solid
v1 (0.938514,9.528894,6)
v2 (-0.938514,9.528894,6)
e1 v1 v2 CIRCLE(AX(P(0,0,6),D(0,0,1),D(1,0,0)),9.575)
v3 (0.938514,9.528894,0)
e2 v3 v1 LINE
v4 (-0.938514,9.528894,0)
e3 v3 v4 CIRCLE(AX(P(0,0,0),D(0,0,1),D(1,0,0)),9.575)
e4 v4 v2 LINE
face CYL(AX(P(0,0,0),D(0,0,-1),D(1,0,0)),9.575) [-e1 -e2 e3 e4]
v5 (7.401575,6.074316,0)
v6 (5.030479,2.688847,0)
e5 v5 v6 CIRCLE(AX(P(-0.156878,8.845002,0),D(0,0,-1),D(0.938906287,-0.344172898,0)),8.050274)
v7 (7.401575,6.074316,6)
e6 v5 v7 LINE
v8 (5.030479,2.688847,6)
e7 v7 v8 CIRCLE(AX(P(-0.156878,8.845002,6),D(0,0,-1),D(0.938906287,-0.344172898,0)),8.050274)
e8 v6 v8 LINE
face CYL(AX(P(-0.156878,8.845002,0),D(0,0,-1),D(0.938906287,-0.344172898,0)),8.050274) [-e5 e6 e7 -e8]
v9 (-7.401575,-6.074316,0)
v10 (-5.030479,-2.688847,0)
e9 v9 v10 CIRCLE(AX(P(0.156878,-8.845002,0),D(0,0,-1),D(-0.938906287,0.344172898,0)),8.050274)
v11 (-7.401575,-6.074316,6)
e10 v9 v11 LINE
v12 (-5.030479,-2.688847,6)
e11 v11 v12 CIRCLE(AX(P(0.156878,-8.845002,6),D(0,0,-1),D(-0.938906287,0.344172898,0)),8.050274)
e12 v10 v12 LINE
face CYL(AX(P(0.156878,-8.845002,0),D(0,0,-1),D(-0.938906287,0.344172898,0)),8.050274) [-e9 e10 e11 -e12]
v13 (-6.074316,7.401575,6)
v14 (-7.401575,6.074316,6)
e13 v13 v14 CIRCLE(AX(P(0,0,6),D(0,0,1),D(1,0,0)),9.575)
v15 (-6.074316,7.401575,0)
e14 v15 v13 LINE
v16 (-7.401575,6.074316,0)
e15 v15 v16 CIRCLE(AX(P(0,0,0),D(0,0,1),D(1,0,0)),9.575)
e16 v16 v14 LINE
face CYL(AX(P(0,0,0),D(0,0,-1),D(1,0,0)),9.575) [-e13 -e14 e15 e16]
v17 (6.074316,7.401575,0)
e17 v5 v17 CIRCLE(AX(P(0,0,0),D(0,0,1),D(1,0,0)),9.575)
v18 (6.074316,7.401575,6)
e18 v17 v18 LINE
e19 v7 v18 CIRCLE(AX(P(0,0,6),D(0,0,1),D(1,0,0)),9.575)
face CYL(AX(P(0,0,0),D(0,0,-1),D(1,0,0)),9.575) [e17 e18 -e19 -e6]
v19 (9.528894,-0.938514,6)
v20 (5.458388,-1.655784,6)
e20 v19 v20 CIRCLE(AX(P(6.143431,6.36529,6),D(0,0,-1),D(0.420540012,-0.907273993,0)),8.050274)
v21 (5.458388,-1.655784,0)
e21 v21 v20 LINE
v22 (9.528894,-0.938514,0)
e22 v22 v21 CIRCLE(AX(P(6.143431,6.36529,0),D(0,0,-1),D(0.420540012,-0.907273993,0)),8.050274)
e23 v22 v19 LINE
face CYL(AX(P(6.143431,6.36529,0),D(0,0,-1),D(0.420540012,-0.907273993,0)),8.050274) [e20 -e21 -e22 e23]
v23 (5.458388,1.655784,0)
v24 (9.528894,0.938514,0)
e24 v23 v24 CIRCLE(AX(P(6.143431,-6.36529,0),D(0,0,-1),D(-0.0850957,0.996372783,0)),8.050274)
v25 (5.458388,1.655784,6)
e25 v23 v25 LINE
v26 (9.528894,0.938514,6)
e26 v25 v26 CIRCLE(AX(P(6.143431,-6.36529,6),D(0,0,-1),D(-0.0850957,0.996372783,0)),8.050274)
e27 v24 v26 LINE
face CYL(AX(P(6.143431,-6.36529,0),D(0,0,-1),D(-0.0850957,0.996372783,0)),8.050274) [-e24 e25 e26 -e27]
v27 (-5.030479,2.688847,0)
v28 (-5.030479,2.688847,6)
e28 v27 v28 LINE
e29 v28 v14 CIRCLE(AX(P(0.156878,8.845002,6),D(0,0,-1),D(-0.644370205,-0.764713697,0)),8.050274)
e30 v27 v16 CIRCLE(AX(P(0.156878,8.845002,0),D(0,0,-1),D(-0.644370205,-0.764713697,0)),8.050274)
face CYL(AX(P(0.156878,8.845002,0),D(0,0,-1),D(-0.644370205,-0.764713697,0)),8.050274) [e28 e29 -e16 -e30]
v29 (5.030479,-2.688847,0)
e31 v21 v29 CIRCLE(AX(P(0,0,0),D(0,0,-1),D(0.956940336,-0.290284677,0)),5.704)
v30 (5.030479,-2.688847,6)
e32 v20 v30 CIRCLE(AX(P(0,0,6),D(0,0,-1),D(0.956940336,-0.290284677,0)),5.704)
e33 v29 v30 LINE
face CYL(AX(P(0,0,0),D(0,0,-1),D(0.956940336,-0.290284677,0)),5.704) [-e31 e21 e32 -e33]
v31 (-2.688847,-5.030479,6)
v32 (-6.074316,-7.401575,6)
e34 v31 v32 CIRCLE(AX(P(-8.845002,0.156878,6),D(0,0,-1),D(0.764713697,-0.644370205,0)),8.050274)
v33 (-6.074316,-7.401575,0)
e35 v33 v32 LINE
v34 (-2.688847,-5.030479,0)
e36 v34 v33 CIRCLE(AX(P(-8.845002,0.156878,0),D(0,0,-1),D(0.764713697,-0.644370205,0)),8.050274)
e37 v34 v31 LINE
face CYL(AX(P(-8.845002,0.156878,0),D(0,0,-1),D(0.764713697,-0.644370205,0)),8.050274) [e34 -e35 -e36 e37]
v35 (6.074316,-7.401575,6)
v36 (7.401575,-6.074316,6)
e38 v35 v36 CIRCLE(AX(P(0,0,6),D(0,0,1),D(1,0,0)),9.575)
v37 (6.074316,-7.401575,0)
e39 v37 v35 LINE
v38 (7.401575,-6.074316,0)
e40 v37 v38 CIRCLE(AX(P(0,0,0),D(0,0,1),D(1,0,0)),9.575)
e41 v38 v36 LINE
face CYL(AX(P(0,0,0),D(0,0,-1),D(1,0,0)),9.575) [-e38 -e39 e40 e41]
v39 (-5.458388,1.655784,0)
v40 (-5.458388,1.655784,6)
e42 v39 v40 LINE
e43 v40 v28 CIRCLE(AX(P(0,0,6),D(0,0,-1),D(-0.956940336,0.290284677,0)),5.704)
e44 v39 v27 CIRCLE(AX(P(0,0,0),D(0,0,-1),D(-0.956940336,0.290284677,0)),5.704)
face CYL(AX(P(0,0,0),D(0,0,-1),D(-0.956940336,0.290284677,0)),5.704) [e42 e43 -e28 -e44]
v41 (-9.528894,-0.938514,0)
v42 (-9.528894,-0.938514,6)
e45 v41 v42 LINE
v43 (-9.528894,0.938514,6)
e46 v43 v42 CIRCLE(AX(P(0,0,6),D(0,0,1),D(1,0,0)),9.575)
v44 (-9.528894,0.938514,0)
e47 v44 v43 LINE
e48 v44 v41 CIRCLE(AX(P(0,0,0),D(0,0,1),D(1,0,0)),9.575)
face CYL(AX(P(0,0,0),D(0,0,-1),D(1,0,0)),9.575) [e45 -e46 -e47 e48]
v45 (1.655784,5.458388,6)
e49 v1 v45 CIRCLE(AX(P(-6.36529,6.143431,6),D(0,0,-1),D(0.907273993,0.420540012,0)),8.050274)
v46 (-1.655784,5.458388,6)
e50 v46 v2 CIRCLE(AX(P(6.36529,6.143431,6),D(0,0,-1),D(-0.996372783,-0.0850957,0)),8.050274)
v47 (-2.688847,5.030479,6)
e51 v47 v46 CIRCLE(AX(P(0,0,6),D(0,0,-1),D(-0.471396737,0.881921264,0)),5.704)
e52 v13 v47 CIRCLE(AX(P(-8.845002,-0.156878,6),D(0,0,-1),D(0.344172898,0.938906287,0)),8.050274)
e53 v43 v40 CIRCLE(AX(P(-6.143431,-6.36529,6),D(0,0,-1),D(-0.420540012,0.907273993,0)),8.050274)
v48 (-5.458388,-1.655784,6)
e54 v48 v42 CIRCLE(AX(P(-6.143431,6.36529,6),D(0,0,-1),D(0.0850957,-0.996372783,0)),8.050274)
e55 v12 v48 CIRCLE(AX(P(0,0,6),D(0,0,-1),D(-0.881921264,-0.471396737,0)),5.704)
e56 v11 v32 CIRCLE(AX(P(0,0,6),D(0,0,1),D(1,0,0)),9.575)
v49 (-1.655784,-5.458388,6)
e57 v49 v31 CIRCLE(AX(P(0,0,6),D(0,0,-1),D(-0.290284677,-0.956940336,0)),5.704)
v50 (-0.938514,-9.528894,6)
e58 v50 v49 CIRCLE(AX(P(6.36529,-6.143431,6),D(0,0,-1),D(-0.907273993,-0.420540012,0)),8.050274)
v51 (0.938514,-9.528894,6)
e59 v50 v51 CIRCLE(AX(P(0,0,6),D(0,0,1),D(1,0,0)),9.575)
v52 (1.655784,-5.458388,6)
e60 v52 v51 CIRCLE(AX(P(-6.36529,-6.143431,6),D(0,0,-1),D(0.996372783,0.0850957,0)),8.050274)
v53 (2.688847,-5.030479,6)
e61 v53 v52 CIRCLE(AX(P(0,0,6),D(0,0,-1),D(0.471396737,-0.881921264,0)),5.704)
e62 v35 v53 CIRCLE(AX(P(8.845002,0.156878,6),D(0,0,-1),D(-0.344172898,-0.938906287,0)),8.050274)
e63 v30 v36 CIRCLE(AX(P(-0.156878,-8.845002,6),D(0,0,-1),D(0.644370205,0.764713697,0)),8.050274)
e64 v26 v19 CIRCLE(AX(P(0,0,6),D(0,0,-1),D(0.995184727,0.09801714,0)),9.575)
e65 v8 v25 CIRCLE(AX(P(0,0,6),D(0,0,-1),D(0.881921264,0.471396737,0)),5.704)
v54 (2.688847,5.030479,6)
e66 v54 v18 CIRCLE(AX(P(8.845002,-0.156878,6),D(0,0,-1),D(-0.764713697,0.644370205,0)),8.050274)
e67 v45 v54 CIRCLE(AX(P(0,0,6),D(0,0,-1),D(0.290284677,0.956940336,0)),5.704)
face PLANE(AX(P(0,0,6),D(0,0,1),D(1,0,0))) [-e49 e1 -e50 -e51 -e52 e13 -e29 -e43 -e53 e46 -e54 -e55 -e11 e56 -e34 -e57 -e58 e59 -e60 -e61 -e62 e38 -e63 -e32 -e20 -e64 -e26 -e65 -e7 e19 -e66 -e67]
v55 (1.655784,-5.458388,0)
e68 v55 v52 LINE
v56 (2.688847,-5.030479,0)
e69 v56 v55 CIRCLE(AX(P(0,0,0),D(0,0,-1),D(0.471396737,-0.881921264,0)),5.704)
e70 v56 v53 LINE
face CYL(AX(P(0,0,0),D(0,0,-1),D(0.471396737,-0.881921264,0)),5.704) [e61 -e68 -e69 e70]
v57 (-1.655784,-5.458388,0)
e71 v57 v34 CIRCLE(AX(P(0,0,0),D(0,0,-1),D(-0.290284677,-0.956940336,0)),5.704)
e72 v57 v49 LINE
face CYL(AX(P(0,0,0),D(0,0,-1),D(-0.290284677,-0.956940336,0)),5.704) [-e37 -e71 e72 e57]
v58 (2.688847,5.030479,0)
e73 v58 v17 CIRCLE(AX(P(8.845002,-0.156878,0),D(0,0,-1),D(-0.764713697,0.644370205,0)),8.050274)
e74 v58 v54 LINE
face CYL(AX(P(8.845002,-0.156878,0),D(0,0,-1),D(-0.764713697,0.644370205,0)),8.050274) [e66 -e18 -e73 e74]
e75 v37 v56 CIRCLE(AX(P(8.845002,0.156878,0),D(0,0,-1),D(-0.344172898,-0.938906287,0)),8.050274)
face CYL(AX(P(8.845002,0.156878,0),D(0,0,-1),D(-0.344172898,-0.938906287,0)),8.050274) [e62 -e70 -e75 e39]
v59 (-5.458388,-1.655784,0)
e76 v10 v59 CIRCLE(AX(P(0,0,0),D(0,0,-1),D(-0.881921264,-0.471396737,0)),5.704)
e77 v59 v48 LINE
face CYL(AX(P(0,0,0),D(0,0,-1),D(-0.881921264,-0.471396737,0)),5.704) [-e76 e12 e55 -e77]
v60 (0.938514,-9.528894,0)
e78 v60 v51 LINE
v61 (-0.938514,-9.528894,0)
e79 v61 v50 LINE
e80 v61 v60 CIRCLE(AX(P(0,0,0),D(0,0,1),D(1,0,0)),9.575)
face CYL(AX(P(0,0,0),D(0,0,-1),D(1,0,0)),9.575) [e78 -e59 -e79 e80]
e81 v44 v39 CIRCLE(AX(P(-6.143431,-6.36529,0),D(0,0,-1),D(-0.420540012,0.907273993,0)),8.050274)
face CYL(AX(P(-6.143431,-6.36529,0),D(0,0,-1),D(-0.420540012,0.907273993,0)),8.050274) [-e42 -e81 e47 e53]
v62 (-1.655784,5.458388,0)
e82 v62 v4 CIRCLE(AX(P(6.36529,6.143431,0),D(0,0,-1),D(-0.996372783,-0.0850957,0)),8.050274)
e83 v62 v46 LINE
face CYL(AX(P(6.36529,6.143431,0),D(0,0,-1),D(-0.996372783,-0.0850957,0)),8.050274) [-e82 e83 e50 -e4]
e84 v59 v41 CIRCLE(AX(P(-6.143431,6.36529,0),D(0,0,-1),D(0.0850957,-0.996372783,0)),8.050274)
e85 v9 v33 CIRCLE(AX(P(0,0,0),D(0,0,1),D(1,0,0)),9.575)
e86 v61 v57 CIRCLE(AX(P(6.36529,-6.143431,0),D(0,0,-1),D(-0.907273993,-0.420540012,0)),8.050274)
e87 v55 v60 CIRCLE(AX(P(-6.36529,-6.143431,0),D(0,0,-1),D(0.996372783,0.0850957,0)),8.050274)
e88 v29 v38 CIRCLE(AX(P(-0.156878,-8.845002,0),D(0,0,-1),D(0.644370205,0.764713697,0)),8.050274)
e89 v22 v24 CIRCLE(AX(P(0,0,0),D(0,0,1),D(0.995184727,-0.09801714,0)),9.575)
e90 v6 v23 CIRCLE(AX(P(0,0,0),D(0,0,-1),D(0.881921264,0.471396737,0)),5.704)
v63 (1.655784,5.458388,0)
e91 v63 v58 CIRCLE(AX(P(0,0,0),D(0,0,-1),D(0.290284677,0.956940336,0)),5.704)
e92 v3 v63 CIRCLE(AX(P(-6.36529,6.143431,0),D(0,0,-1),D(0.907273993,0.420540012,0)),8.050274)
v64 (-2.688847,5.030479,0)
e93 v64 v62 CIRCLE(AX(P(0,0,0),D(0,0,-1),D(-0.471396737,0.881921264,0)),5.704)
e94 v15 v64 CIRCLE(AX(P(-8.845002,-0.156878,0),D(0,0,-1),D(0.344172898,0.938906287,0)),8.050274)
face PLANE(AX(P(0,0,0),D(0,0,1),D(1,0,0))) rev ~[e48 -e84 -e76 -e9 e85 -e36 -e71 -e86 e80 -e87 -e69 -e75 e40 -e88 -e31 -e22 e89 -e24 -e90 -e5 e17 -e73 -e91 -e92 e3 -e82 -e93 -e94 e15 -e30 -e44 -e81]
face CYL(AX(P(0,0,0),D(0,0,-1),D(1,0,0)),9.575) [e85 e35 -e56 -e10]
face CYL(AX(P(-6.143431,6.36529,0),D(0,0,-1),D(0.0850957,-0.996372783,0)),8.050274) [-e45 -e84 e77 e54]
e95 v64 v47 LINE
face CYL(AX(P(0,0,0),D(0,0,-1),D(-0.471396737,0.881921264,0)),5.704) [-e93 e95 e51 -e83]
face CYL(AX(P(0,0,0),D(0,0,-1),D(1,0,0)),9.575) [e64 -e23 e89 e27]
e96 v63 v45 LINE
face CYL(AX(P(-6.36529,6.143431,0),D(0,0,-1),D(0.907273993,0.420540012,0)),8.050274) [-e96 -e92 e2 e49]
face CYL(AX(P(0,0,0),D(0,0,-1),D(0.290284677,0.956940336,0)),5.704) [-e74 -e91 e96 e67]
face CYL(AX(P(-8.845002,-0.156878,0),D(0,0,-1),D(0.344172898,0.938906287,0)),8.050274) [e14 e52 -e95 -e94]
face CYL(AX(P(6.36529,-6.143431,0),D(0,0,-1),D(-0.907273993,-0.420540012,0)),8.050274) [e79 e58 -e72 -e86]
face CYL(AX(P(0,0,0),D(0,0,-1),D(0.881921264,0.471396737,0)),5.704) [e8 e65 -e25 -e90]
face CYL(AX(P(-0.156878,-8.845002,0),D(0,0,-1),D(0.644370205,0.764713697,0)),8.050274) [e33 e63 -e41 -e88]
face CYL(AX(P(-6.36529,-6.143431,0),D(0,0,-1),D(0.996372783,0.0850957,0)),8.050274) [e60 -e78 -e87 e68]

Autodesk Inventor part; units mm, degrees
sketch "Sketch1" plane through (0, 0, 0) normal (0, 0, 1) x (1, 0, 0)
  circle A0 centre (0, 0) radius 9.575
  dimension "d0" = 19.15
extrude "Extrusion1" add sketch "Sketch1" along normal blind 6
ref_plane "Work Plane2" through (0, 0, 3) normal (0, 0, 1) x (1, 0, 0)
sketch "Sketch2" plane through (0, 0, 0) normal (0, 0, -1) x (-1, 0, 0)
  circle A0 centre (0, 0) radius 9.575 projected
  circle A1 centre (0, 0) radius 7
  dimension "d3" = 14
surface extrude "Pitch Diameter" sketch "Sketch2" against normal through all shown no curves A1
ref_plane "Work Plane8" through (0, 0, 0) normal (0.9238795, 0.3826834, 0) x (0, 0, 1)
ref_plane "Work Plane9" through (0, 0, 0) normal (1, 0, 0) x (0, 1, 0)
spur gear teeth "Spur Gear" teeth 8 pitch diameter 14 tip diameter 19.15 root diameter 11.408 face width 20 start plane through (0, 0, 0) normal (0, 0, -1) x (-1, 0, 0)
equation "\"d0\" = da_da"
equation "\"d3\" = da_d"
equation "\"d16\" = da_aw"
equation "\"d43\" = da_aw"
equation "\"d46\" = da_aw"
equation "\"da_da\" = 19.15"
equation "\"da_d\" = 14"
equation "\"da_aw\" = 36.7"
properties part number "Spur Gear2" material "Steel"
